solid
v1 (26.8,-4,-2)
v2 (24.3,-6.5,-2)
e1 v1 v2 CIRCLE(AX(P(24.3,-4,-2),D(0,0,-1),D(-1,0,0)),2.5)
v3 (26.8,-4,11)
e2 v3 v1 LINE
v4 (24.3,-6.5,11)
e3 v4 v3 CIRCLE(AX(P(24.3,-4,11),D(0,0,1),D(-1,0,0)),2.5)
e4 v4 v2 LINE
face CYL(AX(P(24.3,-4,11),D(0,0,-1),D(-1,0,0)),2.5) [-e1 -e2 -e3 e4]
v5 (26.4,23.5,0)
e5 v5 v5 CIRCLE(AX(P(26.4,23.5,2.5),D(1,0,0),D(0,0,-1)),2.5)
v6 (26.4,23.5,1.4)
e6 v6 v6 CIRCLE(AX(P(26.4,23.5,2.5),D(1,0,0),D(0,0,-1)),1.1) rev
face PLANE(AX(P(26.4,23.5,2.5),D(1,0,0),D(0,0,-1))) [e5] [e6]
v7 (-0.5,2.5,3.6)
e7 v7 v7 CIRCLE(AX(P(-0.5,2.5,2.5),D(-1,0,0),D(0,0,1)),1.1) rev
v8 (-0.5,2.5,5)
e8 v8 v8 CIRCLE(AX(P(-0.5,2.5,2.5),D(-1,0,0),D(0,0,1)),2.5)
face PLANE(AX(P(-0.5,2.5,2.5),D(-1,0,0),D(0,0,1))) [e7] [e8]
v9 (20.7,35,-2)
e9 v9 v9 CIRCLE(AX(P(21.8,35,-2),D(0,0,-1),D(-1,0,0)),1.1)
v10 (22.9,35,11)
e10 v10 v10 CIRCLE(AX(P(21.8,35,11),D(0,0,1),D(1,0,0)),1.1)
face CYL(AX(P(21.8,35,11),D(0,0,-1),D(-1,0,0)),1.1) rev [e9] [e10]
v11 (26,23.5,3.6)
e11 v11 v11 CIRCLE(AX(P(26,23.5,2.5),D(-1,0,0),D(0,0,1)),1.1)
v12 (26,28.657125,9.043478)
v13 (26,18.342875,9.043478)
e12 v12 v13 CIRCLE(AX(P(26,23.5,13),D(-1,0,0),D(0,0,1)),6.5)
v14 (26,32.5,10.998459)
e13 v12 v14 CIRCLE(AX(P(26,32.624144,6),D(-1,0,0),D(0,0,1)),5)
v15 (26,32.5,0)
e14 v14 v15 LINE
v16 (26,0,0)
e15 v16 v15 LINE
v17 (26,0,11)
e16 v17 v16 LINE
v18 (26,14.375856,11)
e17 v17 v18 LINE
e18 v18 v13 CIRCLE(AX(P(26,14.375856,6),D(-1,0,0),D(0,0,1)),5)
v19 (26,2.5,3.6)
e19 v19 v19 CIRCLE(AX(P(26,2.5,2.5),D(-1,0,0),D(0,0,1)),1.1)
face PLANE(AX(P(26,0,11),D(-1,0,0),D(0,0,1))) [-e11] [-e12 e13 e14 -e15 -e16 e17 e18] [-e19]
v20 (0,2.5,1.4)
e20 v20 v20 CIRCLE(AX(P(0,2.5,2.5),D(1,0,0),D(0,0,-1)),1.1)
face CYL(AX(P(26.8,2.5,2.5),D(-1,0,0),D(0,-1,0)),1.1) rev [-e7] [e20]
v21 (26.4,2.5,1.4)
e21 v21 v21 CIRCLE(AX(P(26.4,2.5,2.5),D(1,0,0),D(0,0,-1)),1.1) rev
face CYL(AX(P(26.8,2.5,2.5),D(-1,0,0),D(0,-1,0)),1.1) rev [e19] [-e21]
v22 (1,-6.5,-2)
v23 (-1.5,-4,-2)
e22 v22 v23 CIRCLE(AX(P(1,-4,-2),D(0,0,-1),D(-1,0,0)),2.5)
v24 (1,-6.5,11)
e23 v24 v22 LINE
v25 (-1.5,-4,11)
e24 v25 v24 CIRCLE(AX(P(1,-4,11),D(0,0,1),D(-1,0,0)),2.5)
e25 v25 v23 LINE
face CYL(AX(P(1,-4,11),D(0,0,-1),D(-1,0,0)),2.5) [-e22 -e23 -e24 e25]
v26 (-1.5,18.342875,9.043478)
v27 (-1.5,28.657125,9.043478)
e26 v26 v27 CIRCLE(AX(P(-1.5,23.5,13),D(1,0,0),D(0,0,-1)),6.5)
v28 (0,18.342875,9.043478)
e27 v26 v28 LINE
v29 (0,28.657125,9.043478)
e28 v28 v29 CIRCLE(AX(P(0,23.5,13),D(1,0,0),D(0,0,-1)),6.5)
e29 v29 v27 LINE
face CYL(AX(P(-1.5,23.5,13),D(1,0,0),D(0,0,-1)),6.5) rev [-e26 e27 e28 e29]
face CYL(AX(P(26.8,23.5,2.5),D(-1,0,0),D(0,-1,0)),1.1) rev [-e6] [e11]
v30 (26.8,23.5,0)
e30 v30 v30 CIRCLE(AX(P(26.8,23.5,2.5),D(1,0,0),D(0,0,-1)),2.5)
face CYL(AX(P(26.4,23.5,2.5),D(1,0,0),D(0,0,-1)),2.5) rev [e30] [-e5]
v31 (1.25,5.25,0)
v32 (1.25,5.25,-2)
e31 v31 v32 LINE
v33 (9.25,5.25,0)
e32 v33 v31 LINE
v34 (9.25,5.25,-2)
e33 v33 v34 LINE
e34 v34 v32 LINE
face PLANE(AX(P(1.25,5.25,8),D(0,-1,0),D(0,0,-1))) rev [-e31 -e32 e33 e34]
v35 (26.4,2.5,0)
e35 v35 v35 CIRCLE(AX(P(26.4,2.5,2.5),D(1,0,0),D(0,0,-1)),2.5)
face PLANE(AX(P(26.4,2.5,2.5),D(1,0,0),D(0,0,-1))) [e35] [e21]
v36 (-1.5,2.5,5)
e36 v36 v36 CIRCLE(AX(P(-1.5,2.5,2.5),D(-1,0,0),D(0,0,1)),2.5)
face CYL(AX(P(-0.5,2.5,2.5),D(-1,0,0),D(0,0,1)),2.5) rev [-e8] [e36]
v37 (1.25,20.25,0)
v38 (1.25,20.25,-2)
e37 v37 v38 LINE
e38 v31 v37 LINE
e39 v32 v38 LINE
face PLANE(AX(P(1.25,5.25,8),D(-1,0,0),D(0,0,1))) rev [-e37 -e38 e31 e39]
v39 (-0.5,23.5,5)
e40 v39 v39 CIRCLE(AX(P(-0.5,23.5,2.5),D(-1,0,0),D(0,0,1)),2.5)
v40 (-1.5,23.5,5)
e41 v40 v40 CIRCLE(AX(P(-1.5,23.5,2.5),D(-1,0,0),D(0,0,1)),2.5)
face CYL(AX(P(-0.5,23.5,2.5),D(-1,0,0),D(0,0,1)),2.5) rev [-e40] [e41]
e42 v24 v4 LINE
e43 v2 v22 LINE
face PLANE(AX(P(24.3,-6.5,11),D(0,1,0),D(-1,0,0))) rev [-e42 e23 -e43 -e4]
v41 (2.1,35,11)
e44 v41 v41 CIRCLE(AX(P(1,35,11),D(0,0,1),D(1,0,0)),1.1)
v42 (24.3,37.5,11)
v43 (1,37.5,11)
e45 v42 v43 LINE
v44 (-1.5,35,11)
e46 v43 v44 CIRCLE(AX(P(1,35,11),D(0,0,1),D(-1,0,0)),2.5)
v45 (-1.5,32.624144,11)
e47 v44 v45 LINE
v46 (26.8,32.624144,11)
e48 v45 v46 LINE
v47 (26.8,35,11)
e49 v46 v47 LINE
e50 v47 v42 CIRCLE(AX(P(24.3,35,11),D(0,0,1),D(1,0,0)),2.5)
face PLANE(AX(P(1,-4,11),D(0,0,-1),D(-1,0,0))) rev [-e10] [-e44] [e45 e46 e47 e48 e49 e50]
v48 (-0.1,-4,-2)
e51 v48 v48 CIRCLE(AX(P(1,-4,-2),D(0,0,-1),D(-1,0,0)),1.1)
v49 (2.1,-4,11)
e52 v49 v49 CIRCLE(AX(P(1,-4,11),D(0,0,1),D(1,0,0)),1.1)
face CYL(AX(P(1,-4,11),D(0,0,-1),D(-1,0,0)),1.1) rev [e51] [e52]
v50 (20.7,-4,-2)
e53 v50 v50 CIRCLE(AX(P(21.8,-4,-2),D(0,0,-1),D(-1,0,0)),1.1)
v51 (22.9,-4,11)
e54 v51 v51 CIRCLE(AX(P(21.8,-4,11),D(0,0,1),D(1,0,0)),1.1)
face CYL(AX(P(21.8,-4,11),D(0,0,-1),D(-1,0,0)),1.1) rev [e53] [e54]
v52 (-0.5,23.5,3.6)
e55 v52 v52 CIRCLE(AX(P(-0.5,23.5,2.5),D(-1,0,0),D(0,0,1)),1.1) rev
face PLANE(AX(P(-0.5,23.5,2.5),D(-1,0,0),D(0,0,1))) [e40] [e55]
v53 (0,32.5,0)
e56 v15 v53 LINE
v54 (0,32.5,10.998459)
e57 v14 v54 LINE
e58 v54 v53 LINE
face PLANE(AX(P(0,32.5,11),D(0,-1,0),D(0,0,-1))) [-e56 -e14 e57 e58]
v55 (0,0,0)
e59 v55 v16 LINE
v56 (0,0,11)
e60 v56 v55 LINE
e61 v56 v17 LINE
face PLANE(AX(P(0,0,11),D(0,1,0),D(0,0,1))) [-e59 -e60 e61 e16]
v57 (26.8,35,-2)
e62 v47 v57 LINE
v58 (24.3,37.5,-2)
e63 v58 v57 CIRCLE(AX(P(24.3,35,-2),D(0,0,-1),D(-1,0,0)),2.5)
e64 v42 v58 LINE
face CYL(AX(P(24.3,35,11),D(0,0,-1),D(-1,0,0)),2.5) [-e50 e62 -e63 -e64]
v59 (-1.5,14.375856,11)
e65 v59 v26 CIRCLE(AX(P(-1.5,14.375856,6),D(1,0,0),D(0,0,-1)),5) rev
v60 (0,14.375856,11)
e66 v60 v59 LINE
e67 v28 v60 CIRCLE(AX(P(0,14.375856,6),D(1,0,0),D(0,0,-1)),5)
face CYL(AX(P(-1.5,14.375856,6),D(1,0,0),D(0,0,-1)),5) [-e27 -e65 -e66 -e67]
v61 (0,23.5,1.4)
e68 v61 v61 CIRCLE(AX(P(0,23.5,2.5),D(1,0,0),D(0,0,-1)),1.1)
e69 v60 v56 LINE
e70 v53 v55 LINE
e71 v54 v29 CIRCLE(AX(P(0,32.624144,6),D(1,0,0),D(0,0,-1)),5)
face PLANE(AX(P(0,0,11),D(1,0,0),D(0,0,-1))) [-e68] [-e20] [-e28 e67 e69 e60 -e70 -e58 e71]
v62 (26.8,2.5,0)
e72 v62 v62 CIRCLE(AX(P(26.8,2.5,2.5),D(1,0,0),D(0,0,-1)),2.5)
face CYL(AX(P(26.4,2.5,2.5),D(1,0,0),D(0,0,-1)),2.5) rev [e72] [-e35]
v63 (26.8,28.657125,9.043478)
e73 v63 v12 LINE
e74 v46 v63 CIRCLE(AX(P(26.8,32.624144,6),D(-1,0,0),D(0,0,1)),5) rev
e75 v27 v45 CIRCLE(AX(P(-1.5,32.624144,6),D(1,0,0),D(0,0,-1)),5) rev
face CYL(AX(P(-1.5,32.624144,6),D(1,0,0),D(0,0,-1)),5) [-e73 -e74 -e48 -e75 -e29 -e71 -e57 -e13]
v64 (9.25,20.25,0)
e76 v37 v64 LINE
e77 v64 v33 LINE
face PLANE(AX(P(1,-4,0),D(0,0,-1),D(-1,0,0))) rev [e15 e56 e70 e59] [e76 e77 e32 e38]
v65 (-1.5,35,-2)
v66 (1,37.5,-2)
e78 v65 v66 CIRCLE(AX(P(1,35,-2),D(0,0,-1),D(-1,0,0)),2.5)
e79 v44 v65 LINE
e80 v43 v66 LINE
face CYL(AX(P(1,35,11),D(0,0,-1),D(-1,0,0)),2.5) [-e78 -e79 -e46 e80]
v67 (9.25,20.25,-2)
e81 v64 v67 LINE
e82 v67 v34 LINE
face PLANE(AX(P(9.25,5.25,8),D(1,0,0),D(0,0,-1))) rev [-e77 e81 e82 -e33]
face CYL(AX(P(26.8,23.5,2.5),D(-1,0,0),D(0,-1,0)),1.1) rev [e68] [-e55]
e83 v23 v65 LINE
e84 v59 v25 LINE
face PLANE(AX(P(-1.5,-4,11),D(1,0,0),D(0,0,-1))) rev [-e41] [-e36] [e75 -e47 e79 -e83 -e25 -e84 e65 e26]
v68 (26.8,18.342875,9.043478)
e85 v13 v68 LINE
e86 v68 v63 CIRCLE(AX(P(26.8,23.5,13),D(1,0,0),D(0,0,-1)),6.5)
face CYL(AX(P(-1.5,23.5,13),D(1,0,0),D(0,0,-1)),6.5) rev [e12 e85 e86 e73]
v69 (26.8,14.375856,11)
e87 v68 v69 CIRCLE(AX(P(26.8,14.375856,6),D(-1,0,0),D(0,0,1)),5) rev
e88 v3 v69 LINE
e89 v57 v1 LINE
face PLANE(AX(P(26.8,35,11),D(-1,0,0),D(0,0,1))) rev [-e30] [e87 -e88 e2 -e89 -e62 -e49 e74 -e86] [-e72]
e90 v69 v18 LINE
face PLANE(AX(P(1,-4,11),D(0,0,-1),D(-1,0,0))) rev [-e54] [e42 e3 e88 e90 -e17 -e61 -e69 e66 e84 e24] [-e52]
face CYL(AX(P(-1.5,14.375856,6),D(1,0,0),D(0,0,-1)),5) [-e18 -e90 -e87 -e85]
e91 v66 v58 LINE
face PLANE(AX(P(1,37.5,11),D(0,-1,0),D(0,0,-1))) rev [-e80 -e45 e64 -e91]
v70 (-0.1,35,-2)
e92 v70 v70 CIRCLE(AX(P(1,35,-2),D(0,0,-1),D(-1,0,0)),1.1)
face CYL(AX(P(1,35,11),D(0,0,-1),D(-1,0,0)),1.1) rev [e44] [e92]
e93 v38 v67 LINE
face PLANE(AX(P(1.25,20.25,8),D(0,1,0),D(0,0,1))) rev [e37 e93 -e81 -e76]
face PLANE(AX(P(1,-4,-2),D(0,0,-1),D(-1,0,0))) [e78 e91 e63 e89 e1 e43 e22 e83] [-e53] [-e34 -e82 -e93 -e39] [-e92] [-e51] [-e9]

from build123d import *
from build123d.topology import SkipClean

# Parameters (mm, degrees)
SKETCH_1_R          = 1.1
SKETCH_1_W          = 26
SKETCH_1_H          = 32.5
EXTRUDE_1_DEPTH     = 11
EXTRUDE_START       = 2
SKETCH_3_R          = 1.1
EXTRUDE_2_DEPTH     = 2
SKETCH_2_R          = 1.1
CUT_EXTRUDE_1_DEPTH = 49.250803102
SKETCH_4_W          = 8
SKETCH_4_H          = 15
CUT_EXTRUDE_3_DEPTH = 10
SKETCH_5_R          = 6.5
CUT_EXTRUDE_4_DEPTH = 49.250803102
FILLET_START        = -2
FILLET_1_DEPTH      = 30
SKETCH_6_R          = 2.5
CUT_EXTRUDE_5_DEPTH = 0.4
CUT_EXTRUDE_START   = -1
SKETCH_7_R          = 2.5
CUT_EXTRUDE_6_DEPTH = 1


with BuildPart() as part:
    # ｽｹｯﾁ1 → ﾎﾞｽ - 押し出し1 (new body)
    with BuildSketch(Plane.XY):
        with BuildLine():
            Line((26.8, 35), (26.8, -4))
            ThreePointArc((26.8, -4), (26.067766953, -5.767766953), (24.3, -6.5))
            Line((24.3, -6.5), (1, -6.5))
            ThreePointArc((1, -6.5), (-0.767766953, -5.767766953), (-1.5, -4))
            Line((-1.5, -4), (-1.5, 35))
            ThreePointArc((-1.5, 35), (-0.767766953, 36.767766953), (1, 37.5))
            Line((1, 37.5), (24.3, 37.5))
            ThreePointArc((24.3, 37.5), (26.067766953, 36.767766953), (26.8, 35))
        make_face()
        with Locations((21.8, 35)):
            Circle(SKETCH_1_R, mode=Mode.SUBTRACT)
        with Locations((1, 35)):
            Circle(SKETCH_1_R, mode=Mode.SUBTRACT)
        with Locations((1, -4)):
            Circle(SKETCH_1_R, mode=Mode.SUBTRACT)
        with Locations((21.8, -4)):
            Circle(SKETCH_1_R, mode=Mode.SUBTRACT)
        with Locations((13, 16.25)):
            Rectangle(SKETCH_1_W, SKETCH_1_H, mode=Mode.SUBTRACT)
    extrude(amount=EXTRUDE_1_DEPTH)

    # ｽｹｯﾁ3 → ﾎﾞｽ - 押し出し2 (add)
    with SkipClean():  # the faces are left unmerged after this step: merging them gives an invalid solid
        with BuildSketch(Plane(origin=(0, 0, 0), x_dir=(-1, 0, 0), z_dir=(0, 0, -1)).offset(EXTRUDE_START)):
            with BuildLine():
                Line((1.5, -4), (1.5, 35))
                ThreePointArc((1.5, 35), (0.767766953, 36.767766953), (-1, 37.5))
                Line((-1, 37.5), (-24.3, 37.5))
                ThreePointArc((-24.3, 37.5), (-26.067766953, 36.767766953), (-26.8, 35))
                Line((-26.8, 35), (-26.8, -4))
                ThreePointArc((-26.8, -4), (-26.067766953, -5.767766953), (-24.3, -6.5))
                Line((-24.3, -6.5), (-1, -6.5))
                ThreePointArc((-1, -6.5), (0.767766953, -5.767766953), (1.5, -4))
            make_face()
            with Locations((-21.8, -4)):
                Circle(SKETCH_3_R, mode=Mode.SUBTRACT)
            with Locations((-1, -4)):
                Circle(SKETCH_3_R, mode=Mode.SUBTRACT)
            with Locations((-1, 35)):
                Circle(SKETCH_3_R, mode=Mode.SUBTRACT)
            with Locations((-21.8, 35)):
                Circle(SKETCH_3_R, mode=Mode.SUBTRACT)
        extrude(amount=-EXTRUDE_2_DEPTH)

    # ｽｹｯﾁ2 → ｶｯﾄ - 押し出し1 (cut, through all)
    with SkipClean():  # the faces are left unmerged after this step: merging them gives an invalid solid
        with BuildSketch(Plane.ZY.offset(1.5)):
            with Locations(Location((2.5, 23.5, 0), (0, 0, 270))):
                Circle(SKETCH_2_R)
            with Locations(Location((2.5, 2.5, 0), (0, 0, 270))):
                Circle(SKETCH_2_R)
        extrude(amount=-CUT_EXTRUDE_1_DEPTH, mode=Mode.SUBTRACT)

    # ｽｹｯﾁ4 → ｶｯﾄ - 押し出し3 (cut)
    with SkipClean():  # the faces are left unmerged after this step: merging them gives an invalid solid
        with BuildSketch(Plane(origin=(0, 0, -2), x_dir=(-1, 0, 0), z_dir=(0, 0, -1))):
            with Locations((-5.25, 12.75)):
                Rectangle(SKETCH_4_W, SKETCH_4_H)
        extrude(amount=-CUT_EXTRUDE_3_DEPTH, mode=Mode.SUBTRACT)

    # ｽｹｯﾁ5 → ｶｯﾄ - 押し出し4 (cut, through all)
    with SkipClean():  # the faces are left unmerged after this step: merging them gives an invalid solid
        with BuildSketch(Plane(origin=(26.8, 0, 0), x_dir=(0, 0, -1), z_dir=(1, 0, 0))):
            with Locations((-13, 23.5)):
                Circle(SKETCH_5_R)
        extrude(amount=-CUT_EXTRUDE_4_DEPTH, mode=Mode.SUBTRACT)

    # ﾌｨﾚｯﾄ1: read off the stored shape, not the designer's step
    # ﾌｨﾚｯﾄ1 outline → ﾌｨﾚｯﾄ1 (cut)
    with SkipClean():  # the faces are left unmerged after this step: merging them gives an invalid solid
        with BuildSketch(Plane.YZ.offset(FILLET_START)):
            with BuildLine():
                ThreePointArc((14.375856205, 11), (16.587485547, 10.484272031), (18.342875246, 9.043478261))
                ThreePointArc((18.342875246, 9.043478261), (17.745349201, 9.977750147), (17.315341562, 11))
                Line((17.315341562, 11), (14.375856205, 11))
            make_face()
            with BuildLine():
                ThreePointArc((29.684658438, 11), (29.254650799, 9.977750147), (28.657124754, 9.043478261))
                ThreePointArc((28.657124754, 9.043478261), (30.412514453, 10.484272031), (32.624143795, 11))
                Line((32.624143795, 11), (29.684658438, 11))
            make_face()
        extrude(amount=FILLET_1_DEPTH, mode=Mode.SUBTRACT)

    # ｽｹｯﾁ6 → ｶｯﾄ - 押し出し5 (cut)
    with SkipClean():  # the faces are left unmerged after this step: merging them gives an invalid solid
        with BuildSketch(Plane(origin=(26.8, 0, 0), x_dir=(0, 0, -1), z_dir=(1, 0, 0))):
            with Locations((-2.5, 2.5)):
                Circle(SKETCH_6_R)
            with Locations((-2.5, 23.5)):
                Circle(SKETCH_6_R)
        extrude(amount=-CUT_EXTRUDE_5_DEPTH, mode=Mode.SUBTRACT)

    # ｽｹｯﾁ7 → ｶｯﾄ - 押し出し6 (cut)
    with SkipClean():  # the faces are left unmerged after this step: merging them gives an invalid solid
        with BuildSketch(Plane.ZY.offset(1.5).offset(CUT_EXTRUDE_START)):
            with Locations(Location((2.5, 2.5, 0), (0, 0, 180))):
                Circle(SKETCH_7_R)
            with Locations(Location((2.5, 23.5, 0), (0, 0, 180))):
                Circle(SKETCH_7_R)
        extrude(amount=CUT_EXTRUDE_6_DEPTH, mode=Mode.SUBTRACT)


solid = part.part
